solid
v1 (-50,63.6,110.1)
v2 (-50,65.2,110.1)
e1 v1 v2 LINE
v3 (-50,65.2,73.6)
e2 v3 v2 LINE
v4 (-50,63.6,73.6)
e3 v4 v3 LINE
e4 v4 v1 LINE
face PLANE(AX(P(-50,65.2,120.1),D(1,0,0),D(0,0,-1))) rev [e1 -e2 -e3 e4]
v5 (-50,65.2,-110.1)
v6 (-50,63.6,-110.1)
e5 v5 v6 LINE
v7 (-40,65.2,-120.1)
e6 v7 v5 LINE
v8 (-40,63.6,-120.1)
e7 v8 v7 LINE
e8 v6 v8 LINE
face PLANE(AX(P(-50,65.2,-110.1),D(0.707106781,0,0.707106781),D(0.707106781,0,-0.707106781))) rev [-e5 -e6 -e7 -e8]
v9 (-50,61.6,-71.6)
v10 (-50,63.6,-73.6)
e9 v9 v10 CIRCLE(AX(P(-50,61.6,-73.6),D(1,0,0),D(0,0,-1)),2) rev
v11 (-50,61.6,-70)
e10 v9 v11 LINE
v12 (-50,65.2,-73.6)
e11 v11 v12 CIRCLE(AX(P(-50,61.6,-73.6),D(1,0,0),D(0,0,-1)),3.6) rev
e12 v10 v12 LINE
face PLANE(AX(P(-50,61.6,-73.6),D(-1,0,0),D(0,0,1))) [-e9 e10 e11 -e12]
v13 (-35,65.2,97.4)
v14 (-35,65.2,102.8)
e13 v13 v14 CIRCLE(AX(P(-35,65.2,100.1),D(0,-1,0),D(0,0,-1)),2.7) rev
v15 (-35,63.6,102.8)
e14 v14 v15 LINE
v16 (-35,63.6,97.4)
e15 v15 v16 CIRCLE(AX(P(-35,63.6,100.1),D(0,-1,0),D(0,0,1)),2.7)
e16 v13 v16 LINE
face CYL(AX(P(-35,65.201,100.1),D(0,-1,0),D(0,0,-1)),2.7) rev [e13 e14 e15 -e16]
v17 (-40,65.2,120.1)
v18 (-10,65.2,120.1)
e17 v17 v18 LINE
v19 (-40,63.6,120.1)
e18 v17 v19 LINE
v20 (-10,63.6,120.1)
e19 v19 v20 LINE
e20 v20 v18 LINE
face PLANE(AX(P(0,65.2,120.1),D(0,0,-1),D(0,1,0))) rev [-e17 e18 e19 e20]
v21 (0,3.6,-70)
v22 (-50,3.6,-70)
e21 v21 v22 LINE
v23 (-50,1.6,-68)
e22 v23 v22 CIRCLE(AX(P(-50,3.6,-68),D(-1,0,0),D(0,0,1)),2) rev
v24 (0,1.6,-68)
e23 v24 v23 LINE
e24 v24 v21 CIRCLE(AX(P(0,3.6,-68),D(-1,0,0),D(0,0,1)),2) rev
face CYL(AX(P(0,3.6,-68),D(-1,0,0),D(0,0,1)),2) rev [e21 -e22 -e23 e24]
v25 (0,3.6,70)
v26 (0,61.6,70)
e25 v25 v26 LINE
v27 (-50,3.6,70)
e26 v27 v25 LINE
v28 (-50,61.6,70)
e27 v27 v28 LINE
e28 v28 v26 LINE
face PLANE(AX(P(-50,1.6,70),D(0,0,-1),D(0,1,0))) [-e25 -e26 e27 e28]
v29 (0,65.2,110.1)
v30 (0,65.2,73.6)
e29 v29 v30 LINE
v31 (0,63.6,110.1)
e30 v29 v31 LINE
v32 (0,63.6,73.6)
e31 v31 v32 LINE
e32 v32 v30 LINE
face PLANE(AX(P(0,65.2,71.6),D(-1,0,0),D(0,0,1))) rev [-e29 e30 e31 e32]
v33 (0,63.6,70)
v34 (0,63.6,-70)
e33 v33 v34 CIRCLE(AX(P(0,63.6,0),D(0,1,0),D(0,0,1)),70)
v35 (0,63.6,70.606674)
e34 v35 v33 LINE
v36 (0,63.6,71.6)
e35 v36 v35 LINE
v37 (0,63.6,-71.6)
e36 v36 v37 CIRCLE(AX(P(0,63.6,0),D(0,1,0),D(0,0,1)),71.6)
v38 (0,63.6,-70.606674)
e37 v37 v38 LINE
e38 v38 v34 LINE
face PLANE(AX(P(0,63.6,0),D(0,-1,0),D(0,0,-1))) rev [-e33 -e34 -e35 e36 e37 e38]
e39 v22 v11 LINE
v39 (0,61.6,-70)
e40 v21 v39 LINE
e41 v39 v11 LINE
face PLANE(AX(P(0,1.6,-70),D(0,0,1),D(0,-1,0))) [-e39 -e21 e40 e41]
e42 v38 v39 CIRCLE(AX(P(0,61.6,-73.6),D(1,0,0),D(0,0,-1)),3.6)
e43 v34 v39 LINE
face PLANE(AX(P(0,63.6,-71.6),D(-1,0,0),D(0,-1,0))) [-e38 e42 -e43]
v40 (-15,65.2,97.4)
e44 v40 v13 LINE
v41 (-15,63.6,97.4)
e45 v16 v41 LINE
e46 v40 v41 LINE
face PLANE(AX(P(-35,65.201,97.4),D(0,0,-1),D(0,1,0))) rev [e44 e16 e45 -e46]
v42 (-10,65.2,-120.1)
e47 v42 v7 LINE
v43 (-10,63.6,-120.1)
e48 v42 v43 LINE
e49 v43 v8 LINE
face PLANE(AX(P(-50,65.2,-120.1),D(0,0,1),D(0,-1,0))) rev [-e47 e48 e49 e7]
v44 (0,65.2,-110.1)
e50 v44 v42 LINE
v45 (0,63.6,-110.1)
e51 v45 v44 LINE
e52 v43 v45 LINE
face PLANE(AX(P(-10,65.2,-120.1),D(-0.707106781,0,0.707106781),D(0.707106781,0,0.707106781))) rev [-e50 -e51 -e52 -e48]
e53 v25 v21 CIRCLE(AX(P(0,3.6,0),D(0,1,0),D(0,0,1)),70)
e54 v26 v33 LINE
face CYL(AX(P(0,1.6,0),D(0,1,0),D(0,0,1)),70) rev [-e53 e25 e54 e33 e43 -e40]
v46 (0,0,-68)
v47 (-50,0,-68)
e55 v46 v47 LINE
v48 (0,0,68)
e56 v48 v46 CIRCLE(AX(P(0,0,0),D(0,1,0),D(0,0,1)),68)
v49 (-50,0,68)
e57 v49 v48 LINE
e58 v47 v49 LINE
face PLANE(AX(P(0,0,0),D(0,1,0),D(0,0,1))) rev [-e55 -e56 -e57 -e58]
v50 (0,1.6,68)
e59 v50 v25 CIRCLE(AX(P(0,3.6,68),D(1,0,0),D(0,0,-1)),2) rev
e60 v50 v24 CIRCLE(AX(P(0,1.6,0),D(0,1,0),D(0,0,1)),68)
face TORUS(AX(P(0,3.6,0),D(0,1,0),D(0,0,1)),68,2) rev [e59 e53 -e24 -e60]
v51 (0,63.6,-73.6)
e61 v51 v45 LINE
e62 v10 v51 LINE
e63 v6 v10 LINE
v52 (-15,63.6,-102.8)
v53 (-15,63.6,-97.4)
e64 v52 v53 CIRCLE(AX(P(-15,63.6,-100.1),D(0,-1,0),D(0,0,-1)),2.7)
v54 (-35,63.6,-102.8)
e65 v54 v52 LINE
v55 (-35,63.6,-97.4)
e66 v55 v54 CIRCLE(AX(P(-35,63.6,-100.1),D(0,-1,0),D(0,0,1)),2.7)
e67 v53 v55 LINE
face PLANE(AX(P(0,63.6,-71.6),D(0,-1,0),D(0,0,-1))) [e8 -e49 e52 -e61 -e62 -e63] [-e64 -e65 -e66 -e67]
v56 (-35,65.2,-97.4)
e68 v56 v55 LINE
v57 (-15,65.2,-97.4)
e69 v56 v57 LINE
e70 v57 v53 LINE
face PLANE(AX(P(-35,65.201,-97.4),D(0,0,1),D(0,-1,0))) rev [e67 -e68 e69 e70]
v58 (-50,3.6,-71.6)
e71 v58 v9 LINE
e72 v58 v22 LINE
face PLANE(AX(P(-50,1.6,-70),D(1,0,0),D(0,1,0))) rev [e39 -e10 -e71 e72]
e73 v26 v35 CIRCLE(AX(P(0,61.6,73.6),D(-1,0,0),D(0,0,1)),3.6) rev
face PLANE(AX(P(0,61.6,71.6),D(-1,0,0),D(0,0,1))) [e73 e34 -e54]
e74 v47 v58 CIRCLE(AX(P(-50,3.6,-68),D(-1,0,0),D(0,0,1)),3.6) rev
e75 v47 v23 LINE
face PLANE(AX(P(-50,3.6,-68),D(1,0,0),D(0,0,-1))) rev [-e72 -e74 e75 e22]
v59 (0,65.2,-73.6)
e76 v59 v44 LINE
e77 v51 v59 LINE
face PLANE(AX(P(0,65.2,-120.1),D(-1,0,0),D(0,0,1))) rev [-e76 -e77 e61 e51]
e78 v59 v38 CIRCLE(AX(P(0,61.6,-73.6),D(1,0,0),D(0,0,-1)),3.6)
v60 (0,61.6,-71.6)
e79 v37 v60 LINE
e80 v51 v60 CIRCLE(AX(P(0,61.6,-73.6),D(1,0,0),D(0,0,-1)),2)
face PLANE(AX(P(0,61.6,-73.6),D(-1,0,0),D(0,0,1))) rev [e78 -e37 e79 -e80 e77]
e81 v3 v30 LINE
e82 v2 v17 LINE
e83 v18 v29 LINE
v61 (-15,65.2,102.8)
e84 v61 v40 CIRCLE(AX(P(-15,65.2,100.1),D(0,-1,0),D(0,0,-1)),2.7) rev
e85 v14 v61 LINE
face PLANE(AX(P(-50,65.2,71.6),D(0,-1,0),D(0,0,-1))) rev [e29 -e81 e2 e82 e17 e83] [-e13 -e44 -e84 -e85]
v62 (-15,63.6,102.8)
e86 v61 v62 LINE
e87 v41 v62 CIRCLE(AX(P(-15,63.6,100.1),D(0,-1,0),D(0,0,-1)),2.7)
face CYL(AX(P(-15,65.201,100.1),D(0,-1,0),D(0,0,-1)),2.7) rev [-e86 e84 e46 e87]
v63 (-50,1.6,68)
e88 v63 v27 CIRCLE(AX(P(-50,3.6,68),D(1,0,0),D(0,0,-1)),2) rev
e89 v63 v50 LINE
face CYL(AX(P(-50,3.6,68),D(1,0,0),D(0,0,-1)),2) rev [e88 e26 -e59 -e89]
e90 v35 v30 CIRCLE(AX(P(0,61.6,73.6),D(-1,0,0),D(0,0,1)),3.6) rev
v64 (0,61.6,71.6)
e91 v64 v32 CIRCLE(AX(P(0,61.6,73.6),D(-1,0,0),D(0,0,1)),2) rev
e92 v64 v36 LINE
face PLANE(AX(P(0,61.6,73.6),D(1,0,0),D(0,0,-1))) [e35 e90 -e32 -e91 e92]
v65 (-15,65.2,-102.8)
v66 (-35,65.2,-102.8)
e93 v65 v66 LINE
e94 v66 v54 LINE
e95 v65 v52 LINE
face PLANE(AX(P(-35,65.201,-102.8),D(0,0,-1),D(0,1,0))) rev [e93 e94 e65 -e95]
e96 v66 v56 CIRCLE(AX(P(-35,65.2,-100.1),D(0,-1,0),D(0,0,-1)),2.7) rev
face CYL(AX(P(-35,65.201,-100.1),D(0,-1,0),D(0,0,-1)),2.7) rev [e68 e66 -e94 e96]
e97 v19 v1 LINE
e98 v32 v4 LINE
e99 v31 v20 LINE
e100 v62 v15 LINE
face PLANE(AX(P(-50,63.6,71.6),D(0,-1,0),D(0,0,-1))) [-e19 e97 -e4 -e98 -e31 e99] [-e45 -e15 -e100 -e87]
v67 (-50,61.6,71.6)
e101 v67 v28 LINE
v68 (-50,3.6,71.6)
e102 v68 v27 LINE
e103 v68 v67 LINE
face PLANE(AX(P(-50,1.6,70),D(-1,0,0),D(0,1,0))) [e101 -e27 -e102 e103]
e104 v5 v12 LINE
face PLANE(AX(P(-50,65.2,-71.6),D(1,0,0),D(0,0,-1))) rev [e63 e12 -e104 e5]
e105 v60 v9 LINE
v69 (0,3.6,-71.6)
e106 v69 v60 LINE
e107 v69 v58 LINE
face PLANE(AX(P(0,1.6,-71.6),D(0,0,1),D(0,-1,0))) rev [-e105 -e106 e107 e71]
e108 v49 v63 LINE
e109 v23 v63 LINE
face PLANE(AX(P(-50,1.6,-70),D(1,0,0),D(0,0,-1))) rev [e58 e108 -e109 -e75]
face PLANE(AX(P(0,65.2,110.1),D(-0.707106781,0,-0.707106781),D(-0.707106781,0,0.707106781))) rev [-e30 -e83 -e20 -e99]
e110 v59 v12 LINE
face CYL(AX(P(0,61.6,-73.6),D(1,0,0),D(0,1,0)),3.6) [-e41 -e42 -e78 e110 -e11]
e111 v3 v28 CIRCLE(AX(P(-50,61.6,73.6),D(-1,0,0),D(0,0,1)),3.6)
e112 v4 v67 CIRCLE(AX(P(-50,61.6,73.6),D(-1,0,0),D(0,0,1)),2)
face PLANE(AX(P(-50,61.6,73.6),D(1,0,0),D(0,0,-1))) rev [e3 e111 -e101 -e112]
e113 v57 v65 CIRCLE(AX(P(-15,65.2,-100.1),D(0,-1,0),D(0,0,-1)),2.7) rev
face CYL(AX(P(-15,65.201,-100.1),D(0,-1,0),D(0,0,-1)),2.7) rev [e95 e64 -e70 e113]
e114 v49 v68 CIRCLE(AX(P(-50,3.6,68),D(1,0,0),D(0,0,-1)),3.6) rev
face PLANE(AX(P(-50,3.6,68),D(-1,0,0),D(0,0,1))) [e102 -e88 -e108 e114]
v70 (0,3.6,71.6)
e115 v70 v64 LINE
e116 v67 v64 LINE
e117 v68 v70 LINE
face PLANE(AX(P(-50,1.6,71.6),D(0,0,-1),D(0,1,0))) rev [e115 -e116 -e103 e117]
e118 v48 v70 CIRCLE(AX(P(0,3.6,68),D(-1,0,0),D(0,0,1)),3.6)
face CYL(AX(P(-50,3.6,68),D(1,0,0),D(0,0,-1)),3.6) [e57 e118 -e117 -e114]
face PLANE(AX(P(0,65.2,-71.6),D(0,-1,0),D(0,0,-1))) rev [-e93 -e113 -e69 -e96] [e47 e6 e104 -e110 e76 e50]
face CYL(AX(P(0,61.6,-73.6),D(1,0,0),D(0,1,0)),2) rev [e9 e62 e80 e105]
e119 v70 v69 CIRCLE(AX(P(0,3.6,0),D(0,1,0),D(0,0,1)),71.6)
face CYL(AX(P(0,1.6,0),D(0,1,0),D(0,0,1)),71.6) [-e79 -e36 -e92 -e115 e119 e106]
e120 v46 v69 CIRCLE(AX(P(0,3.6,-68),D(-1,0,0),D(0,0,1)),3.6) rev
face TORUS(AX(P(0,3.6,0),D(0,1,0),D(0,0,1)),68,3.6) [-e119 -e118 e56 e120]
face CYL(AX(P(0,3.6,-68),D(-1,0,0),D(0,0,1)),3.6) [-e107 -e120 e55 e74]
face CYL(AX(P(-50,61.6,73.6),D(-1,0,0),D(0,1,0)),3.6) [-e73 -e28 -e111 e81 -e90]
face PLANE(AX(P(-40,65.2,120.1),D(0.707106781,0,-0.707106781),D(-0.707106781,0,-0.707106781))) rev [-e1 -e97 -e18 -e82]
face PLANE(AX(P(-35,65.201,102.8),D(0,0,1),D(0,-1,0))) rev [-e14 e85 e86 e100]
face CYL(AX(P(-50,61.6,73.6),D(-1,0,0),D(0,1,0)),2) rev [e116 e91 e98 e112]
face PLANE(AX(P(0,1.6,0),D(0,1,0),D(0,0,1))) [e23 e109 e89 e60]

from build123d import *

# Parameters (mm, degrees)
SM_BASE_FLANGE_2_DEPTH             = 1.6
SM_START                           = -50
SM_EDGE_FLANGE_2_DEPTH             = 121.6
SM_EDGE_FLANGE_2_2_DEPTH           = 50
SM_EDGE_FLANGE_2_3_ANGLE           = 180
SM_EDGE_FLANGE_2_4_ANGLE           = 180
SM_EDGE_FLANGE_3_STRIP_W           = 10.4
SM_EDGE_FLANGE_3_STRIP_H           = 1.6
SM_EDGE_FLANGE_3_STRIP_CUT_DEPTH   = 50
SM_EDGE_FLANGE_3_STRIP_2_W         = 10.4
SM_EDGE_FLANGE_3_STRIP_2_H         = 1.6
SM_EDGE_FLANGE_3_STRIP_CUT_2_DEPTH = 50
SM_EDGE_FLANGE_3_DEPTH             = 50
SM_EDGE_FLANGE_3_BEND_DEPTH        = 50
CHAMFER_1_SIZE                     = 10
CUT_EXTRUDE_1_REACH                = 155.608


with BuildPart() as part:
    # 基材-凸緣2: sheet metal written as solids
    # 草圖6 → 基材-凸緣2 (new body)
    with BuildSketch(Plane(origin=(0, 0, 0), x_dir=(1, 0, 0), z_dir=(0, 1, 0))):
        with BuildLine():
            Line((-50, 70), (0, 70))
            ThreePointArc((0, 70), (70, 0), (0, -70))
            Line((0, -70), (-50, -70))
            Line((-50, -70), (-50, 70))
        make_face()
    extrude(amount=SM_BASE_FLANGE_2_DEPTH)

    # 邊線-凸緣2: read off the stored shape, not the designer's step
    # 邊線-凸緣2 outline → 邊線-凸緣2 (cut)
    with BuildSketch(Plane.YZ.offset(SM_START)):
        with BuildLine():
            ThreePointArc((0, 68), (0.155005568, 69.044994432), (0.606674091, 70))
            Line((0.606674091, 70), (0, 70))
            Line((0, 70), (0, 68))
        make_face()
        with BuildLine():
            Line((0, -70), (0.606674091, -70))
            ThreePointArc((0.606674091, -70), (0.155005568, -69.044994432), (0, -68))
            Line((0, -68), (0, -70))
        make_face()
    extrude(amount=SM_EDGE_FLANGE_2_DEPTH, mode=Mode.SUBTRACT)

    # Sm Edge Flange 2 2 outline → Sm Edge Flange 2 2 (add)
    with BuildSketch(Plane.YZ.offset(SM_START)):
        with BuildLine():
            Line((3.6, 70), (63.6, 70))
            Line((63.6, 70), (63.6, 71.6))
            Line((63.6, 71.6), (3.6, 71.6))
            ThreePointArc((3.6, 71.6), (1.902943725, 71.174901573), (0.606674091, 70))
            Line((0.606674091, 70), (1.6, 70))
            Line((1.6, 70), (1.6, 68))
            ThreePointArc((1.6, 68), (2.185786438, 69.414213562), (3.6, 70))
        make_face()
        with BuildLine():
            Line((63.6, -71.6), (63.6, -70))
            Line((63.6, -70), (3.6, -70))
            ThreePointArc((3.6, -70), (2.185786438, -69.414213562), (1.6, -68))
            Line((1.6, -68), (1.6, -70))
            Line((1.6, -70), (0.606674091, -70))
            ThreePointArc((0.606674091, -70), (1.902943725, -71.174901573), (3.6, -71.6))
            Line((3.6, -71.6), (63.6, -71.6))
        make_face()
    extrude(amount=SM_EDGE_FLANGE_2_2_DEPTH)

    # Sm Edge Flange 2 3 outline → Sm Edge Flange 2 3 (revolve, cut)
    with BuildSketch(Plane.ZY):
        with BuildLine():
            ThreePointArc((70, 0.606674091), (69.044994432, 0.155005568), (68, 0))
            Line((68, 0), (70, 0))
            Line((70, 0), (70, 0.606674091))
        make_face()
    revolve(axis=Axis((0, 0, 0), (0, 1, 0)), revolution_arc=SM_EDGE_FLANGE_2_3_ANGLE, mode=Mode.SUBTRACT)

    # Sm Edge Flange 2 4 outline → Sm Edge Flange 2 4 (revolve)
    with BuildSketch(Plane.ZY):
        with BuildLine():
            Line((71.6, 63.6), (70, 63.6))
            Line((70, 63.6), (70, 3.6))
            ThreePointArc((70, 3.6), (69.414213562, 2.185786438), (68, 1.6))
            Line((68, 1.6), (70, 1.6))
            Line((70, 1.6), (70, 0.606674091))
            ThreePointArc((70, 0.606674091), (71.174901573, 1.902943725), (71.6, 3.6))
            Line((71.6, 3.6), (71.6, 63.6))
        make_face()
    revolve(axis=Axis((0, 0, 0), (0, 1, 0)), revolution_arc=SM_EDGE_FLANGE_2_4_ANGLE)

    # 邊線-凸緣3: sheet metal written as solids
    # 邊線-凸緣3 strip (on a plane across the edge) → 邊線-凸緣3 strip cut (cut)
    with BuildSketch(Plane(origin=(0, 63.6, 71.6), x_dir=(0, -1, 0), z_dir=(-1, 0, 0))):
        with Locations((-3.2, -0.8)):
            Rectangle(SM_EDGE_FLANGE_3_STRIP_W, SM_EDGE_FLANGE_3_STRIP_H)
    extrude(amount=SM_EDGE_FLANGE_3_STRIP_CUT_DEPTH, mode=Mode.SUBTRACT)

    # 邊線-凸緣3 strip 2 (on a plane across the edge) → 邊線-凸緣3 strip cut 2 (cut)
    with BuildSketch(Plane(origin=(-50, 63.6, -71.6), x_dir=(0, -1, 0), z_dir=(1, 0, 0))):
        with Locations((-3.2, -0.8)):
            Rectangle(SM_EDGE_FLANGE_3_STRIP_2_W, SM_EDGE_FLANGE_3_STRIP_2_H)
    extrude(amount=SM_EDGE_FLANGE_3_STRIP_CUT_2_DEPTH, mode=Mode.SUBTRACT)

    # 邊線-凸緣3 section (on a plane across the edge) → 邊線-凸緣3 (add)
    with BuildSketch(Plane(origin=(0, 63.6, 71.6), x_dir=(0, -1, 0), z_dir=(-1, 0, 0))):
        with BuildLine():
            Line((-1.6, 2), (-1.6, 48.5))
            Line((-1.6, 48.5), (0, 48.5))
            Line((0, 48.5), (0, 2))
            ThreePointArc((0, 2), (0.585786438, 0.585786438), (2, 0))
            Line((2, 0), (2, -1.6))
            ThreePointArc((2, -1.6), (-0.545584412, -0.545584412), (-1.6, 2))
        make_face()
    extrude(amount=SM_EDGE_FLANGE_3_DEPTH)

    # 邊線-凸緣3 section 2 (on a plane across the edge) → 邊線-凸緣3 bend (add)
    with BuildSketch(Plane(origin=(-50, 63.6, -71.6), x_dir=(0, -1, 0), z_dir=(1, 0, 0))):
        with BuildLine():
            Line((-1.6, 2), (-1.6, 48.5))
            Line((-1.6, 48.5), (0, 48.5))
            Line((0, 48.5), (0, 2))
            ThreePointArc((0, 2), (0.585786438, 0.585786438), (2, 0))
            Line((2, 0), (2, -1.6))
            ThreePointArc((2, -1.6), (-0.545584412, -0.545584412), (-1.6, 2))
        make_face()
    extrude(amount=SM_EDGE_FLANGE_3_BEND_DEPTH)

    # 導角1
    chamfer_1_edges = [part.edges().sort_by_distance(p)[0] for p in [
        (0, 64.4, 120.1),
        (-50, 64.4, 120.1),
        (-50, 64.4, -120.1),
        (0, 64.4, -120.1),
    ]]
    chamfer(chamfer_1_edges, length=CHAMFER_1_SIZE)

    # 草圖18 → 除料-伸長1 (cut, up to next)
    with BuildSketch(Plane.XZ.offset(-63.6), mode=Mode.PRIVATE) as cut_extrude_1_sk1:
        with BuildLine():
            Line((-35, 97.4), (-15, 97.4))
            ThreePointArc((-15, 97.4), (-12.3, 100.1), (-15, 102.8))
            Line((-15, 102.8), (-35, 102.8))
            ThreePointArc((-35, 102.8), (-37.7, 100.1), (-35, 97.4))
        make_face()
    cut_extrude_1_tool1 = extrude(cut_extrude_1_sk1.sketch, amount=-CUT_EXTRUDE_1_REACH, mode=Mode.PRIVATE) & part.part
    # 草圖18 → 除料-伸長1 (cut, up to next)
    with BuildSketch(Plane.XZ.offset(-63.6), mode=Mode.PRIVATE) as cut_extrude_1_sk2:
        with BuildLine():
            Line((-35, -102.8), (-15, -102.8))
            ThreePointArc((-15, -102.8), (-12.3, -100.1), (-15, -97.4))
            Line((-15, -97.4), (-35, -97.4))
            ThreePointArc((-35, -97.4), (-37.7, -100.1), (-35, -102.8))
        make_face()
    cut_extrude_1_tool2 = extrude(cut_extrude_1_sk2.sketch, amount=-CUT_EXTRUDE_1_REACH, mode=Mode.PRIVATE) & part.part
    add(cut_extrude_1_tool1.solids().sort_by_distance((-25, 63.6, 100.1))[0], mode=Mode.SUBTRACT)
    add(cut_extrude_1_tool2.solids().sort_by_distance((-25, 63.6, -100.1))[0], mode=Mode.SUBTRACT)


solid = part.part
